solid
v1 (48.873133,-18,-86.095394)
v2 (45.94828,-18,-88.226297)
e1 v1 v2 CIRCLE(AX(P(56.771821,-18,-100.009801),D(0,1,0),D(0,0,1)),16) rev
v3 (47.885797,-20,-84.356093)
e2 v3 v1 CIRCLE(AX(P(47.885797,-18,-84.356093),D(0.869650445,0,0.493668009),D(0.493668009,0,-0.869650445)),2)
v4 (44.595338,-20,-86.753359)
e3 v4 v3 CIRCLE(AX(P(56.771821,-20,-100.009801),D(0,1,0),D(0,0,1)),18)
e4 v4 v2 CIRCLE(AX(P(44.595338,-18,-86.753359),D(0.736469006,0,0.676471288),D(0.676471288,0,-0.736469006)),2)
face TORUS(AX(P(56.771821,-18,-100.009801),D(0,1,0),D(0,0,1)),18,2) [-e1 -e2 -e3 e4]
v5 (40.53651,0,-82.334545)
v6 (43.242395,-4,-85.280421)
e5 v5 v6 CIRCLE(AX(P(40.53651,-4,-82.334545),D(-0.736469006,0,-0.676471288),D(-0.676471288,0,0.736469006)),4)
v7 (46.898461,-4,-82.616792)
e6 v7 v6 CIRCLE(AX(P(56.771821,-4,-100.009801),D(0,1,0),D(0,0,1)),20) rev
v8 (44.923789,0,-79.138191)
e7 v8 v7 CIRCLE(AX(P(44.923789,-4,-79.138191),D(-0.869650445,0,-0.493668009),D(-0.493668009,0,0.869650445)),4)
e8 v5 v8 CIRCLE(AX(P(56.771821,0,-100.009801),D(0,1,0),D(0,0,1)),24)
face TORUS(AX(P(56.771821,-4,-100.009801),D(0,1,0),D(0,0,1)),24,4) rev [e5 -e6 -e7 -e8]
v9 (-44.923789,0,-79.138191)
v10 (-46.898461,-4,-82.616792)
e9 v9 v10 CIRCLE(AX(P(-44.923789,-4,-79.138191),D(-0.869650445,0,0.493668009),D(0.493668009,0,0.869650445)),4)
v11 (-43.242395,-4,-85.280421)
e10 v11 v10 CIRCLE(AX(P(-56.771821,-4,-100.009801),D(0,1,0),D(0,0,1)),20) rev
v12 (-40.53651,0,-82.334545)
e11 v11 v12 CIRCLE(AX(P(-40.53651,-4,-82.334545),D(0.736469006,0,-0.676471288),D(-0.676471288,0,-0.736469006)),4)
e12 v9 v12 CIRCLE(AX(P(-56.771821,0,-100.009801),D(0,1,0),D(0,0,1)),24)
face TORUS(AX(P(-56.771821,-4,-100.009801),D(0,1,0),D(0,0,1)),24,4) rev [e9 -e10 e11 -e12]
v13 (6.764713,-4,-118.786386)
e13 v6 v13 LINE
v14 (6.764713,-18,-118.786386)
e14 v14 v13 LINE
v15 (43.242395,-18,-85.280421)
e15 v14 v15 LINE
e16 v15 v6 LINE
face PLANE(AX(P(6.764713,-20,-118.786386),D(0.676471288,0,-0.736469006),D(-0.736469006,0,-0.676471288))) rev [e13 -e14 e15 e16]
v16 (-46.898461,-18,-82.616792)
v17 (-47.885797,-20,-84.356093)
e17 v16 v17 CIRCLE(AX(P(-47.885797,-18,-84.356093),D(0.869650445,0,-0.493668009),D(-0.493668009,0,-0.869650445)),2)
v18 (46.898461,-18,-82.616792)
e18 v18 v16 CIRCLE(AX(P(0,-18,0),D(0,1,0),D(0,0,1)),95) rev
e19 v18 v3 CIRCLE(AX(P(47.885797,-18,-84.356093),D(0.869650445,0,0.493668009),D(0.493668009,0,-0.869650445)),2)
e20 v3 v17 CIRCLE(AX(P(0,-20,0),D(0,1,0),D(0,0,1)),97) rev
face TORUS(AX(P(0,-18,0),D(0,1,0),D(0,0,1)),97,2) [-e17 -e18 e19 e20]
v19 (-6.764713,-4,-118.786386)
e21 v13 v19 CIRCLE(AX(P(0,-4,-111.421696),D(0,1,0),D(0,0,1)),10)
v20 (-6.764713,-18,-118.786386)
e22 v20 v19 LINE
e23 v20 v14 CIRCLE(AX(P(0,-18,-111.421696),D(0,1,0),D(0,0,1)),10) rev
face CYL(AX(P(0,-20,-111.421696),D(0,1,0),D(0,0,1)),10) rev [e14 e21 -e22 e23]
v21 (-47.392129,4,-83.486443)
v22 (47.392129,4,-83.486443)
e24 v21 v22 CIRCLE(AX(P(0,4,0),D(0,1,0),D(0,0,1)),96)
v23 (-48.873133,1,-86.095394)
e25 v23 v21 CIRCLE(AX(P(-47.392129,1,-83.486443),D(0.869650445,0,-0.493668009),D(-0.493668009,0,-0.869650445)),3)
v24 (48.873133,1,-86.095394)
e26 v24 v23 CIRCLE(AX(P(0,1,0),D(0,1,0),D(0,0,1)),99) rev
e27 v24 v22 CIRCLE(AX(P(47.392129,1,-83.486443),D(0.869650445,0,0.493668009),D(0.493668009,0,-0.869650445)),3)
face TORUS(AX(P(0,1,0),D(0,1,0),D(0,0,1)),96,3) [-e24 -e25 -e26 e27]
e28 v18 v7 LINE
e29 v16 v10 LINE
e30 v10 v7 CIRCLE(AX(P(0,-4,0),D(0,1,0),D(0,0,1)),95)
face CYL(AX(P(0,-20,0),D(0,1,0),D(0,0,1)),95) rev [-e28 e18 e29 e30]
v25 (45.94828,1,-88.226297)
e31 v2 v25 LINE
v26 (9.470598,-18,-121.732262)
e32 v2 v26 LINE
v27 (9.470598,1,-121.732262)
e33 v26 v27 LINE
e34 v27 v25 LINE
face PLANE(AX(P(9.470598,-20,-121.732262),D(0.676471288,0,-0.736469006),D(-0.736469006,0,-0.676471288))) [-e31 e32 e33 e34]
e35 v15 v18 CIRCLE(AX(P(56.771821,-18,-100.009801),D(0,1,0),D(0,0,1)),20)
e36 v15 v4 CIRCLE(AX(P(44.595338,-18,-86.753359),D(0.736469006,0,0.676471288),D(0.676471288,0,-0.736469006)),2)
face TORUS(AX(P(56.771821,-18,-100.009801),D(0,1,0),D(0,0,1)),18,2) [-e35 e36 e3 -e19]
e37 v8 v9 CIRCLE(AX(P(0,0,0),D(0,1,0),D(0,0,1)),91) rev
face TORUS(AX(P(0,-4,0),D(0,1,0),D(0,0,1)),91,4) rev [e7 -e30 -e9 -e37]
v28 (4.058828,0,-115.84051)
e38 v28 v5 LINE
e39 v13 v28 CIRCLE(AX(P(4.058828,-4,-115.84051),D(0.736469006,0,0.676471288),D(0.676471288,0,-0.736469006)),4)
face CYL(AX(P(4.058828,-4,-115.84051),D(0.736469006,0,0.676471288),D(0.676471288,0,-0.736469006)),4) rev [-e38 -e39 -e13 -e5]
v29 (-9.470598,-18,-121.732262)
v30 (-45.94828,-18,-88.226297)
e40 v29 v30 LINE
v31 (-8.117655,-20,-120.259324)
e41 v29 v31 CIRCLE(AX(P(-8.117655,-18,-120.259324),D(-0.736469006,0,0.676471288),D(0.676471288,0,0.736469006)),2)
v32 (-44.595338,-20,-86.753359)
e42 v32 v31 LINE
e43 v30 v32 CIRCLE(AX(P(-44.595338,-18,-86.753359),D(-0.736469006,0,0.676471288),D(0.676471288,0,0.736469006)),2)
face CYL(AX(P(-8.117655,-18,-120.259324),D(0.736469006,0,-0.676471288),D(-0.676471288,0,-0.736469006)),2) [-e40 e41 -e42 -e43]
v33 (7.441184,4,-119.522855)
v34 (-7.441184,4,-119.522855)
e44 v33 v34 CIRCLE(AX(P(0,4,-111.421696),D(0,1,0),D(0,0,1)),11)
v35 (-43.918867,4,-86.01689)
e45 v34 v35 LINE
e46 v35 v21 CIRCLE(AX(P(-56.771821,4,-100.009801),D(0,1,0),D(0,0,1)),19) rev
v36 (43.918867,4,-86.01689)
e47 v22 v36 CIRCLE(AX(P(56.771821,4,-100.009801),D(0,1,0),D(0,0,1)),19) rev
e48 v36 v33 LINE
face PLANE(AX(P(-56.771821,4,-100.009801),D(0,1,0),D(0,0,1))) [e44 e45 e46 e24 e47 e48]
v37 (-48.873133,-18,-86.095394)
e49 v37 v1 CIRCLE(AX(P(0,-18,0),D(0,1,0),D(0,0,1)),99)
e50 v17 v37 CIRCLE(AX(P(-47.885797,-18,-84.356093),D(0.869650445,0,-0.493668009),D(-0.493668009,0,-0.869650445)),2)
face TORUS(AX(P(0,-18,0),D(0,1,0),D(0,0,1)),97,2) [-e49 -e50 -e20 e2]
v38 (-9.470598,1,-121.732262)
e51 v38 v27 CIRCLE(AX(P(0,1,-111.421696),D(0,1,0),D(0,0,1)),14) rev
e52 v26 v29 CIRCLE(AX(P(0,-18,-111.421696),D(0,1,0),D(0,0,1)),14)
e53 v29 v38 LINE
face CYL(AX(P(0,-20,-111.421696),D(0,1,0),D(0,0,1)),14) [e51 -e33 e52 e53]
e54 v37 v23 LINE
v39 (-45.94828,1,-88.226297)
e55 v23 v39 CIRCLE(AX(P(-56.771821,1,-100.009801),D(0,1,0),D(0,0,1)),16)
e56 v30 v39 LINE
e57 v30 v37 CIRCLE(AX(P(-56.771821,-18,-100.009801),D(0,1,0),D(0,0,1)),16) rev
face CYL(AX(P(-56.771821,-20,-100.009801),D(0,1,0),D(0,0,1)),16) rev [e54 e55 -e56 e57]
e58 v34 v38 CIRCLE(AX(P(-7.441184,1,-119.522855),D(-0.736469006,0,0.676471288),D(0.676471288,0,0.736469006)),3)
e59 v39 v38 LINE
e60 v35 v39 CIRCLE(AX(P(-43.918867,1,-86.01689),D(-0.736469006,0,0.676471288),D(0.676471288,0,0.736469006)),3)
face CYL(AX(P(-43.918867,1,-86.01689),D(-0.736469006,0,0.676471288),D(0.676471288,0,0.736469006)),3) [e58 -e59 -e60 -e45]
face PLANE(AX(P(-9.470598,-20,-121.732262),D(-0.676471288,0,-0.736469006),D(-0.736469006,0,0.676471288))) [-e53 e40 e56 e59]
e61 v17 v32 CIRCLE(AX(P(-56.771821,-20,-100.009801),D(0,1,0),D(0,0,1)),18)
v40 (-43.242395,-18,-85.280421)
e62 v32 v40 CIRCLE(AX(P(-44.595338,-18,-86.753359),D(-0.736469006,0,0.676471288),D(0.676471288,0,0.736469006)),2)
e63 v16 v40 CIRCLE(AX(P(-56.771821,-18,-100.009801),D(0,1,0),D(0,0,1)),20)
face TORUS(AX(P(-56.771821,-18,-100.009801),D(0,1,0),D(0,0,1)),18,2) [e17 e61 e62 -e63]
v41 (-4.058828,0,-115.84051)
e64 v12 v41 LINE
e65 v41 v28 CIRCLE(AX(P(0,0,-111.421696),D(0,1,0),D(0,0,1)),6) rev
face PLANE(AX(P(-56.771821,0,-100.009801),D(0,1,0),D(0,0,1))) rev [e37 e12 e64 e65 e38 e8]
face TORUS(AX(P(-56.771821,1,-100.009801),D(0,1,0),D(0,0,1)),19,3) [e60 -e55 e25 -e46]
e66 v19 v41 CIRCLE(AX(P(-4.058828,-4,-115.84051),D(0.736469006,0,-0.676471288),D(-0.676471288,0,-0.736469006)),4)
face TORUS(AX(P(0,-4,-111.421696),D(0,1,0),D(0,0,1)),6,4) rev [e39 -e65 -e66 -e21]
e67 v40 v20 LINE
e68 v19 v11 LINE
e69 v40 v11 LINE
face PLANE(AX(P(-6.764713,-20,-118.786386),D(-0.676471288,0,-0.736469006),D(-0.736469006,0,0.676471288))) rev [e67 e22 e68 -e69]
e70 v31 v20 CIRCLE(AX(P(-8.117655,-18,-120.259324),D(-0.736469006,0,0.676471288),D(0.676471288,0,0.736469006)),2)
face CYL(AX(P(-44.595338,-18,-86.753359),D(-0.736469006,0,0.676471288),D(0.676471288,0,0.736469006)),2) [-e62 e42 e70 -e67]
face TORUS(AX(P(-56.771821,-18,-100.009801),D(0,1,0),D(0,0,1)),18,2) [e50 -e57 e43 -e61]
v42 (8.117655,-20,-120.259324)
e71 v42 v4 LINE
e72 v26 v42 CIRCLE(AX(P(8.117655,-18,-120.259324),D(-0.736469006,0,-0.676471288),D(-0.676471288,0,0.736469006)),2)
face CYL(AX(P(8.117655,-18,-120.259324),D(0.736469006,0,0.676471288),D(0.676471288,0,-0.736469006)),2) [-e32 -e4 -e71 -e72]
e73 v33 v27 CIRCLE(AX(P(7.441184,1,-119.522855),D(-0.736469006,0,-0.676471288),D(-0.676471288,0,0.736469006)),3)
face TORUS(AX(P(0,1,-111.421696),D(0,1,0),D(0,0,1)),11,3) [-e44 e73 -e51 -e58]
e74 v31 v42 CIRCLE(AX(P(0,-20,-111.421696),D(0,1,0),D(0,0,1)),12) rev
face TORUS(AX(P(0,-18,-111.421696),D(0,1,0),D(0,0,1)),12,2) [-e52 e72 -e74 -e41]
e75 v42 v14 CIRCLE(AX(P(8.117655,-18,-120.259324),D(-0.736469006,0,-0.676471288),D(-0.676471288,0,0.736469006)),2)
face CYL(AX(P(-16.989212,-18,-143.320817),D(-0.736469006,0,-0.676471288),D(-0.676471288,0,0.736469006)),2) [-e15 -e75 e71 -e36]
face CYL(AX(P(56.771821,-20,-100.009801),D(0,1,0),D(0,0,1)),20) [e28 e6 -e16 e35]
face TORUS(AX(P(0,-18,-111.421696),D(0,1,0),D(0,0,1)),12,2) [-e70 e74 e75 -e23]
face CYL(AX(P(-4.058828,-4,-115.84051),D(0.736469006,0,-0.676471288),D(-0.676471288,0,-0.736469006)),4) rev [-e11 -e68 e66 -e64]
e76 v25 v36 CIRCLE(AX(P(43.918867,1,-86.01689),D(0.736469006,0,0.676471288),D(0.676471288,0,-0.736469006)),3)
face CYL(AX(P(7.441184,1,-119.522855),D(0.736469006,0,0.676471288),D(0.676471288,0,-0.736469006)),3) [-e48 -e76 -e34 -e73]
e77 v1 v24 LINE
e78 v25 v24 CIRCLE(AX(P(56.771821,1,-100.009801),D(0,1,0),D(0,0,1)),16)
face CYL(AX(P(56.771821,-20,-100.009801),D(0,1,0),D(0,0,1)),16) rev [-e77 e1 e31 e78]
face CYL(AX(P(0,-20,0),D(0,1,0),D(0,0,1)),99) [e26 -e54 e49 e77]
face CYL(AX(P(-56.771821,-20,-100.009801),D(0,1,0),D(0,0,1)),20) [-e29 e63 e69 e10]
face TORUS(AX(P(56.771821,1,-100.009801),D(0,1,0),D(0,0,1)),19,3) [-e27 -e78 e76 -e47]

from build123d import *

# Parameters (mm, degrees)
BOSS_EXTRUDE1_DEPTH = 20
BOSS_EXTRUDE2_START = 4
BOSS_EXTRUDE2_DEPTH = 4
FILLET1_R           = 4
FILLET2_R           = 3
FILLET3_R           = 2


with BuildPart() as part:
    # Sketch2 → Boss-Extrude1 (new body)
    with BuildSketch(Plane(origin=(0, 0, 0), x_dir=(1, 0, 0), z_dir=(0, 1, 0))):
        with BuildLine():
            Line((9.470598027, 121.732262156), (45.948280407, 88.226297118))
            ThreePointArc((45.948280407, 88.226297118), (47.350268632, 87.077889107), (48.873132869, 86.09539409))
            ThreePointArc((48.873132869, 86.09539409), (0, -99), (-48.873132869, 86.09539409))
            ThreePointArc((-48.873132869, 86.09539409), (-47.350268632, 87.077889107), (-45.948280407, 88.226297118))
            Line((-45.948280407, 88.226297118), (-9.470598027, 121.732262156))
            ThreePointArc((-9.470598027, 121.732262156), (0, 125.42169607), (9.470598027, 121.732262156))
        make_face()
        with BuildLine():
            Line((-6.764712877, 118.786386131), (-43.242395256, 85.280421094))
            ThreePointArc((-43.242395256, 85.280421094), (-44.994880537, 83.84491108), (-46.898460834, 82.616792309))
            ThreePointArc((-46.898460834, 82.616792309), (0, -95), (46.898460834, 82.616792309))
            ThreePointArc((46.898460834, 82.616792309), (44.994880537, 83.84491108), (43.242395256, 85.280421094))
            Line((43.242395256, 85.280421094), (6.764712877, 118.786386131))
            ThreePointArc((6.764712877, 118.786386131), (0, 121.42169607), (-6.764712877, 118.786386131))
        make_face(mode=Mode.SUBTRACT)
    extrude(amount=-BOSS_EXTRUDE1_DEPTH)

    # Sketch2<2> → Boss-Extrude2 (add)
    with BuildSketch(Plane(origin=(0, 0, 0), x_dir=(1, 0, 0), z_dir=(0, 1, 0)).offset(BOSS_EXTRUDE2_START)):
        with BuildLine():
            Line((9.470598027, 121.732262156), (45.948280407, 88.226297118))
            ThreePointArc((45.948280407, 88.226297118), (47.350268632, 87.077889107), (48.873132869, 86.09539409))
            ThreePointArc((48.873132869, 86.09539409), (0, -99), (-48.873132869, 86.09539409))
            ThreePointArc((-48.873132869, 86.09539409), (-47.350268632, 87.077889107), (-45.948280407, 88.226297118))
            Line((-45.948280407, 88.226297118), (-9.470598027, 121.732262156))
            ThreePointArc((-9.470598027, 121.732262156), (0, 125.42169607), (9.470598027, 121.732262156))
        make_face()
    extrude(amount=-BOSS_EXTRUDE2_DEPTH)

    # Fillet1
    fillet1_edges = [part.edges().sort_by_distance(p)[0] for p in [
        (44.994880537, 0, -83.84491108),
        (25.003554066, 0, -102.033403612),
        (0, 0, -121.42169607),
        (-25.003554066, 0, -102.033403612),
        (-44.994880537, 0, -83.84491108),
        (0, 0, 95),
    ]]
    fillet(fillet1_edges, radius=FILLET1_R)

    # Fillet2
    fillet2_edges = [part.edges().sort_by_distance(p)[0] for p in [
        (-47.350268632, 4, -87.077889107),
        (27.709439217, 4, -104.979279637),
        (0, 4, -125.42169607),
        (0, 4, 99),
        (47.350268632, 4, -87.077889107),
        (-27.709439217, 4, -104.979279637),
    ]]
    fillet(fillet2_edges, radius=FILLET2_R)

    # Fillet3
    fillet3_edges = [part.edges().sort_by_distance(p)[0] for p in [
        (47.350268632, -20, -87.077889107),
        (27.709439217, -20, -104.979279637),
        (0, -20, -125.42169607),
        (44.994880537, -20, -83.84491108),
        (0, -20, 95),
        (-44.994880537, -20, -83.84491108),
        (-25.003554066, -20, -102.033403612),
        (0, -20, -121.42169607),
        (25.003554066, -20, -102.033403612),
        (-27.709439217, -20, -104.979279637),
        (-47.350268632, -20, -87.077889107),
        (0, -20, 99),
    ]]
    fillet(fillet3_edges, radius=FILLET3_R - 0.0001)  # a hair under: the kernel refuses the full size


solid = part.part
